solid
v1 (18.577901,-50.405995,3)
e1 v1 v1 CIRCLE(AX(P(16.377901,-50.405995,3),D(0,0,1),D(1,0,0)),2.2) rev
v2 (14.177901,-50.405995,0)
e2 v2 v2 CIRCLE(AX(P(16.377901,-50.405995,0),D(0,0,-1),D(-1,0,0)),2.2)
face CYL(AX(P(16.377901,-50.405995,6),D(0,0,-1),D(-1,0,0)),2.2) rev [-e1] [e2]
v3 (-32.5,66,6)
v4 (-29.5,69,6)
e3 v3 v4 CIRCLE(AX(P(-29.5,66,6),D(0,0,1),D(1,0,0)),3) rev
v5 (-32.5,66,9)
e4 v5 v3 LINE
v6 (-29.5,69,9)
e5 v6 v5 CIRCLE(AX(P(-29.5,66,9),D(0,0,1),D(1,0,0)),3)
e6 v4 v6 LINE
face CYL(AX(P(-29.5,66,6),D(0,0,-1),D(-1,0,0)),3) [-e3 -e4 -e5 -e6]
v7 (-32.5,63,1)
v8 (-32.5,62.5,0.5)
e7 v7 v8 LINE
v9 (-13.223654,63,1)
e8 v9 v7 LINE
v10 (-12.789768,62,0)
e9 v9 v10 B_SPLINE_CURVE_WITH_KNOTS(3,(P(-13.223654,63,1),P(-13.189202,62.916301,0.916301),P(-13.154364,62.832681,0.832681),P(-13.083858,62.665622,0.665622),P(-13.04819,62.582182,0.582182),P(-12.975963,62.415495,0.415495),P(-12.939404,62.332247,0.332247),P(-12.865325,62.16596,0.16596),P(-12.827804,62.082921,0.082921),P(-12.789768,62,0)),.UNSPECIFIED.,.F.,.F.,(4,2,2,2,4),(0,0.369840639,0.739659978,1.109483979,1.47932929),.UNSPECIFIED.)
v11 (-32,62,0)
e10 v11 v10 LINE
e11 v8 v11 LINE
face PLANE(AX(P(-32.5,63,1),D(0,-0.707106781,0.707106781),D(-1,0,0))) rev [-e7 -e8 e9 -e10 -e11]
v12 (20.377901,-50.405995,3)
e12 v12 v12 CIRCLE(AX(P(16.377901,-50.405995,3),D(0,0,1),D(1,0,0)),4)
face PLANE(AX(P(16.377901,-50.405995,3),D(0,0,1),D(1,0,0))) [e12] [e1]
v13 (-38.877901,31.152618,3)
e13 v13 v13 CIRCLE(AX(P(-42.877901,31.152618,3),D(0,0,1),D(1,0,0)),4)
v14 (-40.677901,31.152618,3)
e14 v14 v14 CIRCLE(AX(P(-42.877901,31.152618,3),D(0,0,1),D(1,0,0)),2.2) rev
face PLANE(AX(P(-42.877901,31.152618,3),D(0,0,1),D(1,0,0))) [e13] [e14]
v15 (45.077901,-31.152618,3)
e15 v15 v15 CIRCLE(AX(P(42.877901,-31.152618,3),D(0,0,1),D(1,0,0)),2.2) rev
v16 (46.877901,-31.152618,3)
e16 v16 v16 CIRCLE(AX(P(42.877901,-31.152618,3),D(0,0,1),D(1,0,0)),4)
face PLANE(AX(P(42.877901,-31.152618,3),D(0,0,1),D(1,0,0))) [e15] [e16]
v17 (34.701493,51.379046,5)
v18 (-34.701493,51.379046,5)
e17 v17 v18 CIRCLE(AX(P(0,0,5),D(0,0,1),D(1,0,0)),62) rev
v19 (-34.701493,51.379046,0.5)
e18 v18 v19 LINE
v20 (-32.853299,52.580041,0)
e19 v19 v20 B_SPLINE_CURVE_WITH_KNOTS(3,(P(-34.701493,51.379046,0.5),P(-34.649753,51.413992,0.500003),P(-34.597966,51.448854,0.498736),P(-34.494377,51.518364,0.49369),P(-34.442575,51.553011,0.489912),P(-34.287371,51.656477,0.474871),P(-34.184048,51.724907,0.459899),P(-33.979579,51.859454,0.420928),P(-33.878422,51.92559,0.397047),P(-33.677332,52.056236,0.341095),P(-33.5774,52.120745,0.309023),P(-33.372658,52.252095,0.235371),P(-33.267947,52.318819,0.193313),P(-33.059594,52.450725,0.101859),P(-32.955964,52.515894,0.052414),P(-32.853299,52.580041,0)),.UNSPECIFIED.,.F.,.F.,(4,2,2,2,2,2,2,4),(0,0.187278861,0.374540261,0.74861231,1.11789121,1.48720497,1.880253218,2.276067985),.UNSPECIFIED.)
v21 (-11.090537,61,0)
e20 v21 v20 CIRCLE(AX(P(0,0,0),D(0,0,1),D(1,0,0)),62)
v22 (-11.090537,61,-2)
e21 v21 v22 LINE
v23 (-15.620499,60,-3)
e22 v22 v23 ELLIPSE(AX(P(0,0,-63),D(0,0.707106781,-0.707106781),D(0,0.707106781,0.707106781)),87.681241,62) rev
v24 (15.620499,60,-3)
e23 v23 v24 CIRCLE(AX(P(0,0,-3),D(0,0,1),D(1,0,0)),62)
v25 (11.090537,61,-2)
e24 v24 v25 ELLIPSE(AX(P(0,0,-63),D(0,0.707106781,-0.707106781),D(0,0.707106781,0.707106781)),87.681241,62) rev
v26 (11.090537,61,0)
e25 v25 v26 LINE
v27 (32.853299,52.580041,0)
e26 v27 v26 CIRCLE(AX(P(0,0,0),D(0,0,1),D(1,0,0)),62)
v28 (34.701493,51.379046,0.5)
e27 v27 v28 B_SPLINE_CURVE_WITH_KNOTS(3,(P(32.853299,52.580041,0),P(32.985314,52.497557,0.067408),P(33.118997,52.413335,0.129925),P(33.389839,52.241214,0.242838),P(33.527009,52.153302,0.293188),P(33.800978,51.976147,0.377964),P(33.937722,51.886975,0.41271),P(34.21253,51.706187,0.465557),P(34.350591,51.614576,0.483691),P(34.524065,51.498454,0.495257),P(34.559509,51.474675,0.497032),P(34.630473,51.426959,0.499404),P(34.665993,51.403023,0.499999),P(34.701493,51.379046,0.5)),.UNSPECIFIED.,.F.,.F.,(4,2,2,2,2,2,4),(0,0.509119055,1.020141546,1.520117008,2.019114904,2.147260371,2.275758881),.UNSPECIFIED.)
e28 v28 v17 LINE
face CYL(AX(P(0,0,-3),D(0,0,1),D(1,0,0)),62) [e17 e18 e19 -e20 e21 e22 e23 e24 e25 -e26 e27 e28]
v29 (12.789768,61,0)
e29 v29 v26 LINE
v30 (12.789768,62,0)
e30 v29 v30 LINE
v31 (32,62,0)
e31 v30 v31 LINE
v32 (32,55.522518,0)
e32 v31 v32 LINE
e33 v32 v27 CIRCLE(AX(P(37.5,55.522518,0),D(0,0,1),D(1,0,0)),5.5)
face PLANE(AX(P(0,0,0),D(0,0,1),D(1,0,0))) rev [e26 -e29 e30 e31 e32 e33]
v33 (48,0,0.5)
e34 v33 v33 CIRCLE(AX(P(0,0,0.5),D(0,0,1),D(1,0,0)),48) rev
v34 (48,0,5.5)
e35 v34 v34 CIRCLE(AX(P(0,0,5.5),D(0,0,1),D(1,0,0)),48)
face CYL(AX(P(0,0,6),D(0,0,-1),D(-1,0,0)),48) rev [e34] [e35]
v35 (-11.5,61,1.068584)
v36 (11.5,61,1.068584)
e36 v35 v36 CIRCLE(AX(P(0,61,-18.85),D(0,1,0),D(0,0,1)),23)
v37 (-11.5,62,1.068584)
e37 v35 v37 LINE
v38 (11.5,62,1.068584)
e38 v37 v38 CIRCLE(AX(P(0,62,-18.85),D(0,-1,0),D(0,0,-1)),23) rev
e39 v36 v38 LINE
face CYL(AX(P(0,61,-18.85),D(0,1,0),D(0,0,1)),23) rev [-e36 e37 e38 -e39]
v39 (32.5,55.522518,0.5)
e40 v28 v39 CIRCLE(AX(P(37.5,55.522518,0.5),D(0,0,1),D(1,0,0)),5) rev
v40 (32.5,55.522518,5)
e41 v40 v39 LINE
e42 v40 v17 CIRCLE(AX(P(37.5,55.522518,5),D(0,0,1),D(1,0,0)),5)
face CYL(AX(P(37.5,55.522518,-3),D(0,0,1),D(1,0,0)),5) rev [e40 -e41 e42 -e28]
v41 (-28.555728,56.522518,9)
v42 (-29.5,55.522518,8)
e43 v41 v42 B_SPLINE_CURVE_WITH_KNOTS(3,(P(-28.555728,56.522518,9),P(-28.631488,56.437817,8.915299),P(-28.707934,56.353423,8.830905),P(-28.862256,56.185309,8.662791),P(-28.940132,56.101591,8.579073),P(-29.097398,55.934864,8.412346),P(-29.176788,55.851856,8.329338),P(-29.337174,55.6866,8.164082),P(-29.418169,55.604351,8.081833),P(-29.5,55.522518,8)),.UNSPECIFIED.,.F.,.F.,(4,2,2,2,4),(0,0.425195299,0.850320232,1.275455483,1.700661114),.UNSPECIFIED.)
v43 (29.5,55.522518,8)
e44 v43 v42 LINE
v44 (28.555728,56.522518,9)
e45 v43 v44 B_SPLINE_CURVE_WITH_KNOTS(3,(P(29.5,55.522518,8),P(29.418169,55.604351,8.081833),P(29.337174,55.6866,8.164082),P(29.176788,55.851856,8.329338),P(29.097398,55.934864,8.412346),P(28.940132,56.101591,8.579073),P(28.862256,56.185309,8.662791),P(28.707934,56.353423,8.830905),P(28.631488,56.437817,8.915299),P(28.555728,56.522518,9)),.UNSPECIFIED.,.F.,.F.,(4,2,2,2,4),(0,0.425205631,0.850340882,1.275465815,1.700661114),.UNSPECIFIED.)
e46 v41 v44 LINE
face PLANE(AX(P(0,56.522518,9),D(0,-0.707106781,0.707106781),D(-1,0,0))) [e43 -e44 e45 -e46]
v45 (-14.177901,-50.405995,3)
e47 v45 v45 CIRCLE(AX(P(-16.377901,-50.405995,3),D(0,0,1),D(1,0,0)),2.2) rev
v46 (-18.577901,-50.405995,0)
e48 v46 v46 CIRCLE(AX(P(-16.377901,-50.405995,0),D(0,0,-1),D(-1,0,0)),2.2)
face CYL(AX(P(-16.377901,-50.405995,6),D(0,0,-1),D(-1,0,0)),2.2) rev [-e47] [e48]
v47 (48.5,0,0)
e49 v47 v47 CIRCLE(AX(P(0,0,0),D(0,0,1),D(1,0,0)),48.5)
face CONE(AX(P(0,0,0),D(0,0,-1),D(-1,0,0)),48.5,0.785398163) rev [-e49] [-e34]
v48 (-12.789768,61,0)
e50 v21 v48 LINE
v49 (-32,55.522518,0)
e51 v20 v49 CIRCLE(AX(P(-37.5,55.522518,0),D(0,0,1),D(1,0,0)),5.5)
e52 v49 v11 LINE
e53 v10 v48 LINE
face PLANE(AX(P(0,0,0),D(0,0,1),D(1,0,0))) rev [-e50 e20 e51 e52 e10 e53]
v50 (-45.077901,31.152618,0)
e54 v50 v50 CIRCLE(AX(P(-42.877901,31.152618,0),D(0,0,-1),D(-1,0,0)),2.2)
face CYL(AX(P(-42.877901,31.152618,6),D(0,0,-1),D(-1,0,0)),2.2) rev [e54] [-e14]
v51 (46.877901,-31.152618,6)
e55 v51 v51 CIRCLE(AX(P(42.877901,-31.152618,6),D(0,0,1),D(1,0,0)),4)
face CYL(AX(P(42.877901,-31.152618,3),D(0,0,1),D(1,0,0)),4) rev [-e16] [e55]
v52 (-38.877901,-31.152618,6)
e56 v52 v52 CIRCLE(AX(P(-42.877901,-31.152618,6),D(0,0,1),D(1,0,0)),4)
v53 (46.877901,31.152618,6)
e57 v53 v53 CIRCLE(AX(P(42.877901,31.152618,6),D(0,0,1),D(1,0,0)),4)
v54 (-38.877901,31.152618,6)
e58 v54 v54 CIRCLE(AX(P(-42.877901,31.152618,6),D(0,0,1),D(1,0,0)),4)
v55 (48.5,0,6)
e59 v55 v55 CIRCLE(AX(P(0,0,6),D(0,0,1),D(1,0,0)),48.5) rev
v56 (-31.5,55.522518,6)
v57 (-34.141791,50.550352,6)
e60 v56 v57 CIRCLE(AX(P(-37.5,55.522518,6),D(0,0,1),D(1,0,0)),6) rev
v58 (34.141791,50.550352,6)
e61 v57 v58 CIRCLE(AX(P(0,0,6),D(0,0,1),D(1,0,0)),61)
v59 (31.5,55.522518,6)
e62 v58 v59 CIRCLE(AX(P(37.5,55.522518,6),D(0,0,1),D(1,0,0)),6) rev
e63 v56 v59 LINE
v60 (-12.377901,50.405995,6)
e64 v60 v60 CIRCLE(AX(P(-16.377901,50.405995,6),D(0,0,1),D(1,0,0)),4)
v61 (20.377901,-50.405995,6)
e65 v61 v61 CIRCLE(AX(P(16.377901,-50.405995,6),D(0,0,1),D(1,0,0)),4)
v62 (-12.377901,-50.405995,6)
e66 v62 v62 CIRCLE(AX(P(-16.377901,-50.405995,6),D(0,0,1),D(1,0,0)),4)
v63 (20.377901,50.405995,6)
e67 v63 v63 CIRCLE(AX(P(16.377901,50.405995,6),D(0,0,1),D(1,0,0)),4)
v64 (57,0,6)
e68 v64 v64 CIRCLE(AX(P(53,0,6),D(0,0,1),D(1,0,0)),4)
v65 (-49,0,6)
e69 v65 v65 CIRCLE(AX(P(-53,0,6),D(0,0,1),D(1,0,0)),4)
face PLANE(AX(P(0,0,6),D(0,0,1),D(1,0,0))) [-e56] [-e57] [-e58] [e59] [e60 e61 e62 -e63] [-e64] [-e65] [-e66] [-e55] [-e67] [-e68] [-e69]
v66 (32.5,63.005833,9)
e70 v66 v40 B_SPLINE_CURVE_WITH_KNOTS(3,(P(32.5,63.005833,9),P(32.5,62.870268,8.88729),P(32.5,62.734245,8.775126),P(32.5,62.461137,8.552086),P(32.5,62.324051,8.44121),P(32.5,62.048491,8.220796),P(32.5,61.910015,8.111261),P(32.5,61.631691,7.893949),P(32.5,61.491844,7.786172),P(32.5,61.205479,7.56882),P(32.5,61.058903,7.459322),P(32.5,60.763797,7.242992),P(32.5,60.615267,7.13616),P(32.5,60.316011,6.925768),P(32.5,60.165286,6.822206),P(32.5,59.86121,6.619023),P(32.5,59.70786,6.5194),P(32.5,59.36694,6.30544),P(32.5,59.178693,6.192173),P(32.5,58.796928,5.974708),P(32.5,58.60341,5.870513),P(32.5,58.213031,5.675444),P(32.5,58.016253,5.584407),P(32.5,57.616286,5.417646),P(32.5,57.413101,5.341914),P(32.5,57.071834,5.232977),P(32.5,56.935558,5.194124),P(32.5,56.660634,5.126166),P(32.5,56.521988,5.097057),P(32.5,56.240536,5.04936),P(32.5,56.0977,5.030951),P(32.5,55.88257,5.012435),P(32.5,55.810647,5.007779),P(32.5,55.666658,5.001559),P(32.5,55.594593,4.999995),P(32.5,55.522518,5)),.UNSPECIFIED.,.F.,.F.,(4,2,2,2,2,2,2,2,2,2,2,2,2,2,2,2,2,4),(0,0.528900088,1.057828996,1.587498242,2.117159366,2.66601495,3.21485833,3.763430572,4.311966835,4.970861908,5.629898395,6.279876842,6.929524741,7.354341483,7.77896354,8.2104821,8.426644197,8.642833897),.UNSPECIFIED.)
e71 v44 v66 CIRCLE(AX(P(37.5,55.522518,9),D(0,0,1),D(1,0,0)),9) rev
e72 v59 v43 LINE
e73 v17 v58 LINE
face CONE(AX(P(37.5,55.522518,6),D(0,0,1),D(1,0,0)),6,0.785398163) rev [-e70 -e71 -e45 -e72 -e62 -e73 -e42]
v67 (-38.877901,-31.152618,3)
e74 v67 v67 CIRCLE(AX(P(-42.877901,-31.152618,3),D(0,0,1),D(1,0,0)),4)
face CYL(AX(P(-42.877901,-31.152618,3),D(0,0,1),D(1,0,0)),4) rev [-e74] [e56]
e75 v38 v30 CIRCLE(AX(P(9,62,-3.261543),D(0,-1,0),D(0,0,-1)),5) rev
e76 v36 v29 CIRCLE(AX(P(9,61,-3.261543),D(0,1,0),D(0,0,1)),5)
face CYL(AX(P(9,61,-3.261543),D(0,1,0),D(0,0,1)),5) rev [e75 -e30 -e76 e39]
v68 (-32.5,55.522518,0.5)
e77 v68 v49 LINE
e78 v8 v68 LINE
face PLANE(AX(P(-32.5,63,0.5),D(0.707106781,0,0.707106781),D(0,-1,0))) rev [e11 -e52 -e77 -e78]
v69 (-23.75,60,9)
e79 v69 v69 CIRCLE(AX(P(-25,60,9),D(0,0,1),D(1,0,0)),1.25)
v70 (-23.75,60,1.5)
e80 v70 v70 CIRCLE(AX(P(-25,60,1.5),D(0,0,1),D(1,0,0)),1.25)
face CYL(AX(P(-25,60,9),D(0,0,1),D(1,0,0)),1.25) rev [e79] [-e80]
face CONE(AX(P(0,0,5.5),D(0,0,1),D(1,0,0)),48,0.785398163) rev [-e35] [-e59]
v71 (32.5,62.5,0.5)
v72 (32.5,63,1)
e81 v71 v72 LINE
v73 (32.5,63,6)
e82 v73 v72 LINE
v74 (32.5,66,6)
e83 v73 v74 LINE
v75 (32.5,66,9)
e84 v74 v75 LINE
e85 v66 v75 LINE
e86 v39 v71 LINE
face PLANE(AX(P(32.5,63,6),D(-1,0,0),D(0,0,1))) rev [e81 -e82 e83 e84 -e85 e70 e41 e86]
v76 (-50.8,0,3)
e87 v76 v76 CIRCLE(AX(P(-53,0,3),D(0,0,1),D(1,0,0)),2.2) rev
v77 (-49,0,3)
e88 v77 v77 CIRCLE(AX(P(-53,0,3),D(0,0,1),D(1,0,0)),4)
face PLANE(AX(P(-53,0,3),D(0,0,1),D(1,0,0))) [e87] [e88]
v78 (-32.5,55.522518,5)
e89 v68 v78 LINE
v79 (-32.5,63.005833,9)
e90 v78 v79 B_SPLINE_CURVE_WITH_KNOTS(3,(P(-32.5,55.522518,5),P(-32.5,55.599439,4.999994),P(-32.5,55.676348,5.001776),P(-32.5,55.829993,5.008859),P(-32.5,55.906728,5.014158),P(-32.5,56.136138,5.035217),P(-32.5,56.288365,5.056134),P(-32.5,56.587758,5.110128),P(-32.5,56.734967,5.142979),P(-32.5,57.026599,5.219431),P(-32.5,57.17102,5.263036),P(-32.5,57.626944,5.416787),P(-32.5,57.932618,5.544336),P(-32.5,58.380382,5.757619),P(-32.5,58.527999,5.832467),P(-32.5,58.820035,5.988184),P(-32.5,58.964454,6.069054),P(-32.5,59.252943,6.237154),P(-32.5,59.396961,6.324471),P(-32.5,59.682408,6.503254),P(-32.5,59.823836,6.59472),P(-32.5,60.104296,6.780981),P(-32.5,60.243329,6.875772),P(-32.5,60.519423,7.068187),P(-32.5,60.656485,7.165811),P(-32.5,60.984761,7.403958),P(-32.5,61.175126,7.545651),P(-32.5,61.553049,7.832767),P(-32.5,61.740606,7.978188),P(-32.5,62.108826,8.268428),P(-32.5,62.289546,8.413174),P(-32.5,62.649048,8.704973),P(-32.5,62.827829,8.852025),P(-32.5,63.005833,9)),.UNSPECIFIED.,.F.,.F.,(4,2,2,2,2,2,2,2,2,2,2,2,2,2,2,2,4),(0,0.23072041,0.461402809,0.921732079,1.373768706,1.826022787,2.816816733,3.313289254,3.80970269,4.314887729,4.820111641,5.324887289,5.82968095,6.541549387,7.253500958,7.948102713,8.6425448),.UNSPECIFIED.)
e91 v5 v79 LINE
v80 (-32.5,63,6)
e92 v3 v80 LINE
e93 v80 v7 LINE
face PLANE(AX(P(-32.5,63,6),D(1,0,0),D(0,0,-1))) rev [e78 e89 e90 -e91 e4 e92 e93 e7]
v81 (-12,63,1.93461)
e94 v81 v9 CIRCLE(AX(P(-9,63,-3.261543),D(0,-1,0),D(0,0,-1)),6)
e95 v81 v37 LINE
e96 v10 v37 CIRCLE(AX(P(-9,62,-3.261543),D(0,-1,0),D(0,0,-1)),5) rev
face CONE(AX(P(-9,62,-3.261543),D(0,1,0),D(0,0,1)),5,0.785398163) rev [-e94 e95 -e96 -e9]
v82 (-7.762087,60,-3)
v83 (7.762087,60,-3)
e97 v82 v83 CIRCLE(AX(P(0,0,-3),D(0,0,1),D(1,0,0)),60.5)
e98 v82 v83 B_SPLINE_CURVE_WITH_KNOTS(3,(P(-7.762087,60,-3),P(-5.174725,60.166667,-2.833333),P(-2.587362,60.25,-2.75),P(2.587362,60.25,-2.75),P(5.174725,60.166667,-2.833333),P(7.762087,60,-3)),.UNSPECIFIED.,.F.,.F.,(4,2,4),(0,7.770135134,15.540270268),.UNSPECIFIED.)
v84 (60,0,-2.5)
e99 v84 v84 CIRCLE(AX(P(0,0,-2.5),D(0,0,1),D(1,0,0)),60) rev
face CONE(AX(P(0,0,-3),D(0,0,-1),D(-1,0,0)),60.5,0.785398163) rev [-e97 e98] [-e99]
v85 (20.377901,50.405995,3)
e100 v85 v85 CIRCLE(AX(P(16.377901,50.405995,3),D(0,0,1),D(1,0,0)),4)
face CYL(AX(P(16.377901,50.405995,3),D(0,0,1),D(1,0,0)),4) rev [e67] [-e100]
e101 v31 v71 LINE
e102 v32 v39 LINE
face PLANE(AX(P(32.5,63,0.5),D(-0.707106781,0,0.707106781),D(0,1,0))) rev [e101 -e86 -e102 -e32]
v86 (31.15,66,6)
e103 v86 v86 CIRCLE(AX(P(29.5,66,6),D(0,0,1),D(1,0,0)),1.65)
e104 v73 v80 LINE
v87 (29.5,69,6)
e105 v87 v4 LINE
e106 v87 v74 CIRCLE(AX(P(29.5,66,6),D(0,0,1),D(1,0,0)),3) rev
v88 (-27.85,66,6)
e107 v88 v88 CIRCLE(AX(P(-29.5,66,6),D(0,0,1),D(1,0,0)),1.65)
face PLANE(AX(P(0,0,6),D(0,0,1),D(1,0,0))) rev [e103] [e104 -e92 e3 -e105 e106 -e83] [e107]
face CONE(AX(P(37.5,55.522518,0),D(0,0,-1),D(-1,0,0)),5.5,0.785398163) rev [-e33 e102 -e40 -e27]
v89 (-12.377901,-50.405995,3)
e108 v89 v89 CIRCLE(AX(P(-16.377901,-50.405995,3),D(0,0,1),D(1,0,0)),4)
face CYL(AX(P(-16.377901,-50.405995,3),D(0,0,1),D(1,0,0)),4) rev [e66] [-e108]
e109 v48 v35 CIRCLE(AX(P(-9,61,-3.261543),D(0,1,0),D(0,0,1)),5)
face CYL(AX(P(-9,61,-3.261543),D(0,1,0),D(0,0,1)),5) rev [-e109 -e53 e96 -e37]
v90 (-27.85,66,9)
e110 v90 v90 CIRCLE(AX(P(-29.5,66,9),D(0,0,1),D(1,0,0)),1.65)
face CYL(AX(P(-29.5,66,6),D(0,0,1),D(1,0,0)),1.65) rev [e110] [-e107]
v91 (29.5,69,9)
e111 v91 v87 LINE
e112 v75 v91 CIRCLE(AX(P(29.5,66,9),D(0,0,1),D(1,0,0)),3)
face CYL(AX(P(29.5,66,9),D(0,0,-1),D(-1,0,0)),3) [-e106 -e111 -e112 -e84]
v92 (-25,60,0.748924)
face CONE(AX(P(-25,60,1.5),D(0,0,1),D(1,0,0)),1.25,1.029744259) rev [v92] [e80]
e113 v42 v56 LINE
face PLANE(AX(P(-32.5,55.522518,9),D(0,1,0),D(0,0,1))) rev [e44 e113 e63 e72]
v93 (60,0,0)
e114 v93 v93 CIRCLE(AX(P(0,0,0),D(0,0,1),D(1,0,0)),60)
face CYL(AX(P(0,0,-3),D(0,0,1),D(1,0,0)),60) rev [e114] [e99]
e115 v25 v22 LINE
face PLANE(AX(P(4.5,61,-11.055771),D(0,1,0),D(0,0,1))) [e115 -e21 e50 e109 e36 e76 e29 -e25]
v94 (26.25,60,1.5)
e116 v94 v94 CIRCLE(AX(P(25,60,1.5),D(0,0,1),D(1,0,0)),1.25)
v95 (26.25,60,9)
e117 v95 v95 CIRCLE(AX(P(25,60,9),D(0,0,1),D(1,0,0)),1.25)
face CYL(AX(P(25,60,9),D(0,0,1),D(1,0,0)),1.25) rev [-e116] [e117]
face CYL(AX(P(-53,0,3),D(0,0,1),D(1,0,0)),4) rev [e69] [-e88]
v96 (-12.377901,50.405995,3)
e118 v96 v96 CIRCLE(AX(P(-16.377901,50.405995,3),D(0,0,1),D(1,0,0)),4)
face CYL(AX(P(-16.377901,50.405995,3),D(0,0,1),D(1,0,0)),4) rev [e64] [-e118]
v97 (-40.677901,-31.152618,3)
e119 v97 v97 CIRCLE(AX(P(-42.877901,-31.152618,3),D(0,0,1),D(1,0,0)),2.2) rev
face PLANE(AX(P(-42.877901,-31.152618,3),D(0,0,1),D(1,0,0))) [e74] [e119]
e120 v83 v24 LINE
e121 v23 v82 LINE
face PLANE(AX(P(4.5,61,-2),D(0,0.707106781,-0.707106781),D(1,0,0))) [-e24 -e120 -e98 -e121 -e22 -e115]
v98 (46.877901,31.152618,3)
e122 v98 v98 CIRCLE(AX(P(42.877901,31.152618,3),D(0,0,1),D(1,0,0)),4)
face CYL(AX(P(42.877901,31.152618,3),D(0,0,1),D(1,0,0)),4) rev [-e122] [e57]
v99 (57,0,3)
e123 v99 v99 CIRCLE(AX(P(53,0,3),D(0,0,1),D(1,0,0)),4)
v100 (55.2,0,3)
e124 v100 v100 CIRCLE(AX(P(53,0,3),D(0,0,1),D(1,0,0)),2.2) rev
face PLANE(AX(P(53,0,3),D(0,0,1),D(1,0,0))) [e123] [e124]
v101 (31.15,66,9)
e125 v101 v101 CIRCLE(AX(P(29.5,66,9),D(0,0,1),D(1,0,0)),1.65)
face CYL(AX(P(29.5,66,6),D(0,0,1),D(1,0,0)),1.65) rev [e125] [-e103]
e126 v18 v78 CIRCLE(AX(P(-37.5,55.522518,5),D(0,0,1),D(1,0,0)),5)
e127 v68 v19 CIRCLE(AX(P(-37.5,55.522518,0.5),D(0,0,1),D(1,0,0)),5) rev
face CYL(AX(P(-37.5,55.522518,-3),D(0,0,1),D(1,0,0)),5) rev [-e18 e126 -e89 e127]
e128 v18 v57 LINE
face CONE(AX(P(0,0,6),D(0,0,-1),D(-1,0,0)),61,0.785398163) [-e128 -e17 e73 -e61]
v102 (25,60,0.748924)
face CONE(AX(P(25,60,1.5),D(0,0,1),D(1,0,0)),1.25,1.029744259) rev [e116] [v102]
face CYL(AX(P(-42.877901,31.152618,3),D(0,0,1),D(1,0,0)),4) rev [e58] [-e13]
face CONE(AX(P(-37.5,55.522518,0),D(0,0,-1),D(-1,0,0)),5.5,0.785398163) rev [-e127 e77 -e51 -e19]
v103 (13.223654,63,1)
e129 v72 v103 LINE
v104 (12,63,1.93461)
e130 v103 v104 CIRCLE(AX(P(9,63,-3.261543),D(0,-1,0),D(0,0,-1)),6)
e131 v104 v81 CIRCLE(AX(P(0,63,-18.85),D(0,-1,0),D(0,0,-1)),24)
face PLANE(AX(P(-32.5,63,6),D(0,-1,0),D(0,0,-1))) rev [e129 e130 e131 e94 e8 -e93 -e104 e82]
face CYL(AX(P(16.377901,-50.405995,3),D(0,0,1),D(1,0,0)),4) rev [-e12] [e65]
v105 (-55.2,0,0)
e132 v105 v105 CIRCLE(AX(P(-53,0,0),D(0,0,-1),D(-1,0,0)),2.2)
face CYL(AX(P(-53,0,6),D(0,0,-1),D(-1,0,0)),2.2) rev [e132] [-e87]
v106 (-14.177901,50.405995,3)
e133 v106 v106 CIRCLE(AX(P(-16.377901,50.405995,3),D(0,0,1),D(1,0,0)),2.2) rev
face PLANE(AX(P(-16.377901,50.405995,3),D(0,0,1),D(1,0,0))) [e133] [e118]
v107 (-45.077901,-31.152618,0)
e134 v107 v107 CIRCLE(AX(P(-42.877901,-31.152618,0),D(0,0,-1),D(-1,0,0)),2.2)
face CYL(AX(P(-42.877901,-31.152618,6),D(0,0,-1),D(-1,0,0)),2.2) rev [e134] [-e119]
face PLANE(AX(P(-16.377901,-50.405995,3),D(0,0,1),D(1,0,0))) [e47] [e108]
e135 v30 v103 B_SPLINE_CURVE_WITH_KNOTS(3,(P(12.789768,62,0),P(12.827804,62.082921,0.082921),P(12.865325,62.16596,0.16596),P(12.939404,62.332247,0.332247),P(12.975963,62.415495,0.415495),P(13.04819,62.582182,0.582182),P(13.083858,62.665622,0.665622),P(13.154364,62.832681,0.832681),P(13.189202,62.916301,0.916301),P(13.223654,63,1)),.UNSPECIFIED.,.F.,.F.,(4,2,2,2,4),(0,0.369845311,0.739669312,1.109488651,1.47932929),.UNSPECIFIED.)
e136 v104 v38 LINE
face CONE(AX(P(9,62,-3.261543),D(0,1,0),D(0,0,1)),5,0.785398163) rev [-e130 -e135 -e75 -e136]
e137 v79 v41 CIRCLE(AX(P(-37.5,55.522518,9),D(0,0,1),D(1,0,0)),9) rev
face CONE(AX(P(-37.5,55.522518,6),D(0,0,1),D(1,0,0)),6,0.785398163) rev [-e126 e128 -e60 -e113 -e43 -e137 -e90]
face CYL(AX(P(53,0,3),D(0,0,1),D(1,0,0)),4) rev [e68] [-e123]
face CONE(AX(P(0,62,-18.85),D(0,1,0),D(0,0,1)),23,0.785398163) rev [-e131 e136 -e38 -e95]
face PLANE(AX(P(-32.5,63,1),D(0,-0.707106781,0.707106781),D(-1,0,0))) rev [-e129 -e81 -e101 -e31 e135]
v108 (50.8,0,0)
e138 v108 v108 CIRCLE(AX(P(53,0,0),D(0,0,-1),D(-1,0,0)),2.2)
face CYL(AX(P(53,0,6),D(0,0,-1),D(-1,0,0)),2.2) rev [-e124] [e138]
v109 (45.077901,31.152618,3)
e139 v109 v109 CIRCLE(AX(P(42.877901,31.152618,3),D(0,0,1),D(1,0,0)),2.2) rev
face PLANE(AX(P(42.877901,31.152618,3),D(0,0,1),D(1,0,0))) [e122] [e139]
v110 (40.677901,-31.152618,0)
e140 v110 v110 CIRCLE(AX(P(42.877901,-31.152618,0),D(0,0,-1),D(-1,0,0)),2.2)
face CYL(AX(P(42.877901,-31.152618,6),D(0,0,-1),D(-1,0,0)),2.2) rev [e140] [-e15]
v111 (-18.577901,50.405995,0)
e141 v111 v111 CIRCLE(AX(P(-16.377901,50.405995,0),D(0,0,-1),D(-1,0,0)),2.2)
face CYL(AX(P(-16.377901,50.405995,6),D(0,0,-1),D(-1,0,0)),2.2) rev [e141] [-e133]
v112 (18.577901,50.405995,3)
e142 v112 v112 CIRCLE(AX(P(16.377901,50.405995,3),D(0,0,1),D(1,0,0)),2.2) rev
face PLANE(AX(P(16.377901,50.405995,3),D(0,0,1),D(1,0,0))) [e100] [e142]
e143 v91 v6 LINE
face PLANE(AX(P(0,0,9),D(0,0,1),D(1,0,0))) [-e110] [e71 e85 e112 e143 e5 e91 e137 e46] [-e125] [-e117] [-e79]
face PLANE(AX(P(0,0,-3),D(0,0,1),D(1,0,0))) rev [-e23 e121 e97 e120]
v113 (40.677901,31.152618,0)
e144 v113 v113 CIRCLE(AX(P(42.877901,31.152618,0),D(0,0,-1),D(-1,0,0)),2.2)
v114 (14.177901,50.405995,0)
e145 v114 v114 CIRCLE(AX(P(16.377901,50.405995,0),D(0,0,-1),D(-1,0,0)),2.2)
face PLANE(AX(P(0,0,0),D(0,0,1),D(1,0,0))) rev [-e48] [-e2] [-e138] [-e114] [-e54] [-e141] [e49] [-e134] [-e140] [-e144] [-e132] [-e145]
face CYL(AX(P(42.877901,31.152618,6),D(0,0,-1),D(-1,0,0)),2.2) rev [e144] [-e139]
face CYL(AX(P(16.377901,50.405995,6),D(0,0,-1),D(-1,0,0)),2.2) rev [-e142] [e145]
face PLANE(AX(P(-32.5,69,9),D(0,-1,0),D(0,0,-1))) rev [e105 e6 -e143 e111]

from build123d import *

# Parameters (mm, degrees)
SKETCH_1_R             = 62
SKETCH_1_R_2           = 60
EXTRUDE_1_DEPTH        = 3
EXTRUDE_START          = 6
SKETCH_2_R             = 48
EXTRUDE_2_DEPTH        = 6
FILLET_1_R             = 5
CHAMFER_1_SIZE         = 0.5
CHAMFER_2_SIZE         = 0.5
SKETCH_6_R             = 2.2
CUT_EXTRUDE_1_DEPTH    = 6
SKETCH_7_W             = 65
SKETCH_7_H             = 13.477482046
EXTRUDE_3_DEPTH        = 3
SKETCH_11_R            = 1.65
CUT_EXTRUDE_2_DEPTH    = 3
CHAMFER_3_SIZE         = 1
CHAMFER_4_SIZE         = 1
FILLET_2_R             = 3
CHAMFER_5_3_ANGLE      = 291.929687
SKETCH_12_R            = 4
CUT_EXTRUDE_3_DEPTH    = 3
CUT_EXTRUDE_4_DEPTH    = 2
CHAMFER_6_SIZE         = 1
HOLE_WIZARD_M3_1_D     = 2.5
HOLE_WIZARD_M3_1_DEPTH = 7.5
HOLE_WIZARD_M3_1_TIP   = 0.751075774


with BuildPart() as part:
    # 草图1 → 凸台-拉伸1 (new body)
    with BuildSketch(Plane.XY):
        Circle(SKETCH_1_R)
        Circle(SKETCH_1_R_2, mode=Mode.SUBTRACT)
    extrude(amount=-EXTRUDE_1_DEPTH)

    # 草图2 → 凸台-拉伸2 (add)
    with BuildSketch(Plane.XY.offset(EXTRUDE_START)):
        with BuildLine():
            Line((-32.5, 63), (32.5, 63))
            Line((32.5, 63), (32.5, 52.79914772))
            ThreePointArc((32.5, 52.79914772), (0, -62), (-32.5, 52.79914772))
            Line((-32.5, 52.79914772), (-32.5, 63))
        make_face()
        Circle(SKETCH_2_R, mode=Mode.SUBTRACT)
    extrude(amount=-EXTRUDE_2_DEPTH)

    # 圆角1
    # the kernel refuses this fillet: 5 mm, written as the material it adds along each edge
    with BuildSketch(Plane(origin=(32.5, 52.79914772, 6), x_dir=(0.8403342947446245, -0.5420685132675156, 0), z_dir=(0, 0, -1))) as fillet_1_piece_1:
        with BuildLine():
            CenterArc((2.72541822, -4.998883971), FILLET_1_R, 91.210593649, 55.964843523)
            Line((-1.476253254, -2.288541405), (0, 0))
            ThreePointArc((0, 0), (1.309890927, -0.013838756), (2.619781855, 0))
        make_face()
    extrude(amount=6)
    with BuildSketch(Plane(origin=(-32.5, 52.79914772, 6), x_dir=(-0.840334294744627, -0.5420685132675117, 0), z_dir=(0, 0, -1))) as fillet_1_piece_2:
        with BuildLine():
            CenterArc((2.72541822, 4.998883971), FILLET_1_R, 212.824562828, 55.964843523)
            Line((-1.476253254, 2.288541405), (0, 0))
            ThreePointArc((0, 0), (1.309890927, 0.013838756), (2.619781855, 0))
        make_face()
    extrude(amount=6)

    # 倒角1
    chamfer_1_edges = [part.edges().sort_by_distance(p)[0] for p in [
        (-48, 0, 0),
        (-48, 0, 6),
        (-60, 0, -3),
    ]]
    chamfer(chamfer_1_edges, length=CHAMFER_1_SIZE)

    # 倒角2
    # the kernel refuses this chamfer: 0.5 mm, written as the material it takes off along each edge
    with BuildSketch(Plane(origin=(-32.5, 55.522517954, 0), x_dir=(0, 0, 1), z_dir=(0, 1, 0)), Plane(origin=(32.5, 64.285841494, 0), x_dir=(0, 0, 1), z_dir=(0, -1, 0))) as chamfer_2_piece_1:
        Polygon((CHAMFER_2_SIZE, 0), (0, CHAMFER_2_SIZE), (0, 0), align=None)
    extrude(amount=8.76332354, mode=Mode.SUBTRACT)
    with BuildSketch(Plane(origin=(37.5, 55.522517954, 0), x_dir=(-0.15613015555825177, -0.9877364904291813, 0), z_dir=(0.9877364904291813, -0.15613015555825177, 0))) as chamfer_2_piece_2_section:
        Polygon((5, -CHAMFER_2_SIZE), (5 + CHAMFER_2_SIZE, 0), (5, 0), align=None)
    chamfer_2_piece_2 = revolve(axis=Axis((37.5, 55.522517954, 0), (0, 0, -1)), revolution_arc=81.017652556, mode=Mode.PRIVATE)
    chamfer_2_piece_2 = chamfer_2_piece_2 - Plane(origin=(0, 0, 0), x_dir=(1, 0, 0), z_dir=(0, 0, 1)) * Cylinder(62, 22, mode=Mode.PRIVATE)
    add(chamfer_2_piece_2, mode=Mode.SUBTRACT)
    with BuildSketch(Plane(origin=(-37.5, 55.522517954, 0), x_dir=(1, 0, 0), z_dir=(0, 1, 0))) as chamfer_2_piece_3_section:
        Polygon((5, -CHAMFER_2_SIZE), (5 + CHAMFER_2_SIZE, 0), (5, 0), align=None)
    chamfer_2_piece_3 = revolve(axis=Axis((-37.5, 55.522517954, 0), (0, 0, -1)), revolution_arc=81.017652556, mode=Mode.PRIVATE)
    chamfer_2_piece_3 = chamfer_2_piece_3 - Plane(origin=(0, 0, 0), x_dir=(1, 0, 0), z_dir=(0, 0, 1)) * Cylinder(62, 22, mode=Mode.PRIVATE)
    add(chamfer_2_piece_3, mode=Mode.SUBTRACT)

    # 草图6 → 切除-拉伸1 (cut)
    with BuildSketch(Plane(origin=(0, 0, 0), x_dir=(-1, 0, 0), z_dir=(0, 0, -1))):
        with Locations((-42.877900702, 31.152618372)):
            Circle(SKETCH_6_R)
        with Locations((-53, 0)):
            Circle(SKETCH_6_R)
        with Locations((-42.877900702, -31.152618371)):
            Circle(SKETCH_6_R)
        with Locations((-16.377900702, -50.405995364)):
            Circle(SKETCH_6_R)
        with Locations((16.377900702, -50.405995364)):
            Circle(SKETCH_6_R)
        with Locations((42.877900702, -31.152618371)):
            Circle(SKETCH_6_R)
        with Locations((53, 0)):
            Circle(SKETCH_6_R)
        with Locations((42.877900702, 31.152618372)):
            Circle(SKETCH_6_R)
        with Locations((16.377900702, 50.405995364)):
            Circle(SKETCH_6_R)
        with Locations((-16.377900702, 50.405995364)):
            Circle(SKETCH_6_R)
    extrude(amount=-CUT_EXTRUDE_1_DEPTH, mode=Mode.SUBTRACT)

    # 草图7 → 凸台-拉伸3 (add)
    with BuildSketch(Plane.XY.offset(6)):
        with Locations((0, 62.261258977)):
            Rectangle(SKETCH_7_W, SKETCH_7_H)
    extrude(amount=EXTRUDE_3_DEPTH)

    # 草图11 → 切除-拉伸2 (cut)
    with BuildSketch(Plane.XY.offset(9)):
        with Locations((-29.5, 66)):
            Circle(SKETCH_11_R)
        with Locations((29.5, 66)):
            Circle(SKETCH_11_R)
    extrude(amount=-CUT_EXTRUDE_2_DEPTH, mode=Mode.SUBTRACT)

    # 倒角3
    chamfer_3_edges = [part.edges().sort_by_distance(p)[0] for p in [
        (0, 63, 0),
    ]]
    chamfer(chamfer_3_edges, length=CHAMFER_3_SIZE - 0.0001)  # a hair under: the kernel refuses the full size

    # 倒角4
    chamfer_4_edges = [part.edges().sort_by_distance(p)[0] for p in [
        (0, 55.522517954, 9),
    ]]
    chamfer(chamfer_4_edges, length=CHAMFER_4_SIZE)

    # 圆角2
    fillet_2_edges = [part.edges().sort_by_distance(p)[0] for p in [
        (-32.5, 69, 7.5),
        (32.5, 69, 7.5),
    ]]
    fillet(fillet_2_edges, radius=FILLET_2_R)

    # 倒角5: read off the stored shape, not the designer's step
    # 倒角5 outline → 倒角5 (revolve, cut)
    with BuildSketch(Plane(origin=(37.5, 55.522517954, 0), x_dir=(1, 0, 0), z_dir=(0, -1, 0))):
        Polygon((4.999998721, 9), (4.999998721, 4.999998721), (9, 9), align=None)
    revolve(axis=Axis((37.5, 55.522517954, 0), (0, 0, 1)), mode=Mode.SUBTRACT)

    # Chamfer 5 2 outline → Chamfer 5 2 (revolve, cut)
    with BuildSketch(Plane(origin=(-37.5, 55.522517954, 0), x_dir=(1, 0, 0), z_dir=(0, -1, 0))):
        Polygon((4.99999762, 9), (4.99999762, 4.99999762), (9, 9), align=None)
    revolve(axis=Axis((-37.5, 55.522517954, 0), (0, 0, 1)), mode=Mode.SUBTRACT)

    # Chamfer 5 3 outline → Chamfer 5 3 (revolve, cut)
    with BuildSketch(Plane(origin=(0, 0, 0), x_dir=(-0.5597014925373135, 0.8286942978273132, 0), z_dir=(0.8286942978273132, 0.5597014925373135, 0))):
        Polygon((62, 6), (61, 6), (62, 5), align=None)
    revolve(axis=Axis((0, 0, 0), (0, 0, 1)), revolution_arc=CHAMFER_5_3_ANGLE, mode=Mode.SUBTRACT)

    # 草图12 → 切除-拉伸3 (cut)
    with BuildSketch(Plane.XY.offset(6)):
        with Locations((-16.377900702, 50.405995364)):
            Circle(SKETCH_12_R)
        with Locations((16.377900702, 50.405995364)):
            Circle(SKETCH_12_R)
        with Locations((42.877900702, 31.152618372)):
            Circle(SKETCH_12_R)
        with Locations((53, 0)):
            Circle(SKETCH_12_R)
        with Locations((42.877900702, -31.152618371)):
            Circle(SKETCH_12_R)
        with Locations((16.377900702, -50.405995364)):
            Circle(SKETCH_12_R)
        with Locations((-16.377900702, -50.405995364)):
            Circle(SKETCH_12_R)
        with Locations((-42.877900702, -31.152618371)):
            Circle(SKETCH_12_R)
        with Locations((-53, 0)):
            Circle(SKETCH_12_R)
        with Locations((-42.877900702, 31.152618372)):
            Circle(SKETCH_12_R)
    extrude(amount=-CUT_EXTRUDE_3_DEPTH, mode=Mode.SUBTRACT)

    # 草图14 → 切除-拉伸4 (cut)
    with BuildSketch(Plane(origin=(0, 63, 0), x_dir=(1, 0, 0), z_dir=(0, 1, 0))):
        with BuildLine():
            ThreePointArc((-4.030108666, 3.809429698), (-11.733833556, 7.447967709), (-11.5, -1.068584287))
            ThreePointArc((-11.5, -1.068584287), (0, -4.15), (11.5, -1.068584287))
            ThreePointArc((11.5, -1.068584287), (11.733833556, 7.447967709), (4.030108666, 3.809429698))
            ThreePointArc((4.030108666, 3.809429698), (0, 5.85), (-4.030108666, 3.809429698))
        make_face()
    extrude(amount=-CUT_EXTRUDE_4_DEPTH, mode=Mode.SUBTRACT)

    # 倒角6
    # the kernel refuses this chamfer: 1 mm, written as the material it takes off along each edge
    with BuildSketch(Plane(origin=(18.80558547, 61, -3), x_dir=(0, -1, 0), z_dir=(-1, 0, 0))) as chamfer_6_piece_1:
        Polygon((CHAMFER_6_SIZE, 0), (0, CHAMFER_6_SIZE), (0, 0), align=None)
    extrude(amount=37.61117094, mode=Mode.SUBTRACT)
    with BuildSketch(Plane(origin=(-9, 63, -3.261542732), x_dir=(-0.874686173337968, 0, 0.48468969266055384), z_dir=(-0.48468969266055384, 0, -0.874686173337968))) as chamfer_6_piece_2:
        Polygon((5, -CHAMFER_6_SIZE), (5 + CHAMFER_6_SIZE, 0), (5, 0), align=None)
    revolve(axis=Axis((-9, 63, -3.261542732), (0, 1, 0)), revolution_arc=31.007856081, mode=Mode.SUBTRACT)
    with BuildSketch(Plane(origin=(9, 63, -3.261542732), x_dir=(0.49999999999998873, 0, 0.8660254037844451), z_dir=(-0.8660254037844451, 0, 0.49999999999998873))) as chamfer_6_piece_3:
        Polygon((5, -CHAMFER_6_SIZE), (5 + CHAMFER_6_SIZE, 0), (5, 0), align=None)
    revolve(axis=Axis((9, 63, -3.261542732), (0, 1, 0)), revolution_arc=31.007856081, mode=Mode.SUBTRACT)
    with BuildSketch(Plane(origin=(0, 63, -18.85), x_dir=(-0.500000000000001, 0, 0.8660254037844382), z_dir=(-0.8660254037844382, 0, -0.500000000000001))) as chamfer_6_piece_4:
        Polygon((23, -CHAMFER_6_SIZE), (23 + CHAMFER_6_SIZE, 0), (23, 0), align=None)
    revolve(axis=Axis((0, 63, -18.85), (0, 1, 0)), revolution_arc=60, mode=Mode.SUBTRACT)

    # M3 螺纹孔1
    with Locations(Plane.XY.offset(9)):
        with Locations((-25, 60), (25, 60)):
            Hole(HOLE_WIZARD_M3_1_D / 2, depth=HOLE_WIZARD_M3_1_DEPTH)
            with Locations((0, 0, -(HOLE_WIZARD_M3_1_DEPTH + HOLE_WIZARD_M3_1_TIP / 2))):  # 118° drill point
                Cone(0, HOLE_WIZARD_M3_1_D / 2, HOLE_WIZARD_M3_1_TIP, mode=Mode.SUBTRACT)


solid = part.part
